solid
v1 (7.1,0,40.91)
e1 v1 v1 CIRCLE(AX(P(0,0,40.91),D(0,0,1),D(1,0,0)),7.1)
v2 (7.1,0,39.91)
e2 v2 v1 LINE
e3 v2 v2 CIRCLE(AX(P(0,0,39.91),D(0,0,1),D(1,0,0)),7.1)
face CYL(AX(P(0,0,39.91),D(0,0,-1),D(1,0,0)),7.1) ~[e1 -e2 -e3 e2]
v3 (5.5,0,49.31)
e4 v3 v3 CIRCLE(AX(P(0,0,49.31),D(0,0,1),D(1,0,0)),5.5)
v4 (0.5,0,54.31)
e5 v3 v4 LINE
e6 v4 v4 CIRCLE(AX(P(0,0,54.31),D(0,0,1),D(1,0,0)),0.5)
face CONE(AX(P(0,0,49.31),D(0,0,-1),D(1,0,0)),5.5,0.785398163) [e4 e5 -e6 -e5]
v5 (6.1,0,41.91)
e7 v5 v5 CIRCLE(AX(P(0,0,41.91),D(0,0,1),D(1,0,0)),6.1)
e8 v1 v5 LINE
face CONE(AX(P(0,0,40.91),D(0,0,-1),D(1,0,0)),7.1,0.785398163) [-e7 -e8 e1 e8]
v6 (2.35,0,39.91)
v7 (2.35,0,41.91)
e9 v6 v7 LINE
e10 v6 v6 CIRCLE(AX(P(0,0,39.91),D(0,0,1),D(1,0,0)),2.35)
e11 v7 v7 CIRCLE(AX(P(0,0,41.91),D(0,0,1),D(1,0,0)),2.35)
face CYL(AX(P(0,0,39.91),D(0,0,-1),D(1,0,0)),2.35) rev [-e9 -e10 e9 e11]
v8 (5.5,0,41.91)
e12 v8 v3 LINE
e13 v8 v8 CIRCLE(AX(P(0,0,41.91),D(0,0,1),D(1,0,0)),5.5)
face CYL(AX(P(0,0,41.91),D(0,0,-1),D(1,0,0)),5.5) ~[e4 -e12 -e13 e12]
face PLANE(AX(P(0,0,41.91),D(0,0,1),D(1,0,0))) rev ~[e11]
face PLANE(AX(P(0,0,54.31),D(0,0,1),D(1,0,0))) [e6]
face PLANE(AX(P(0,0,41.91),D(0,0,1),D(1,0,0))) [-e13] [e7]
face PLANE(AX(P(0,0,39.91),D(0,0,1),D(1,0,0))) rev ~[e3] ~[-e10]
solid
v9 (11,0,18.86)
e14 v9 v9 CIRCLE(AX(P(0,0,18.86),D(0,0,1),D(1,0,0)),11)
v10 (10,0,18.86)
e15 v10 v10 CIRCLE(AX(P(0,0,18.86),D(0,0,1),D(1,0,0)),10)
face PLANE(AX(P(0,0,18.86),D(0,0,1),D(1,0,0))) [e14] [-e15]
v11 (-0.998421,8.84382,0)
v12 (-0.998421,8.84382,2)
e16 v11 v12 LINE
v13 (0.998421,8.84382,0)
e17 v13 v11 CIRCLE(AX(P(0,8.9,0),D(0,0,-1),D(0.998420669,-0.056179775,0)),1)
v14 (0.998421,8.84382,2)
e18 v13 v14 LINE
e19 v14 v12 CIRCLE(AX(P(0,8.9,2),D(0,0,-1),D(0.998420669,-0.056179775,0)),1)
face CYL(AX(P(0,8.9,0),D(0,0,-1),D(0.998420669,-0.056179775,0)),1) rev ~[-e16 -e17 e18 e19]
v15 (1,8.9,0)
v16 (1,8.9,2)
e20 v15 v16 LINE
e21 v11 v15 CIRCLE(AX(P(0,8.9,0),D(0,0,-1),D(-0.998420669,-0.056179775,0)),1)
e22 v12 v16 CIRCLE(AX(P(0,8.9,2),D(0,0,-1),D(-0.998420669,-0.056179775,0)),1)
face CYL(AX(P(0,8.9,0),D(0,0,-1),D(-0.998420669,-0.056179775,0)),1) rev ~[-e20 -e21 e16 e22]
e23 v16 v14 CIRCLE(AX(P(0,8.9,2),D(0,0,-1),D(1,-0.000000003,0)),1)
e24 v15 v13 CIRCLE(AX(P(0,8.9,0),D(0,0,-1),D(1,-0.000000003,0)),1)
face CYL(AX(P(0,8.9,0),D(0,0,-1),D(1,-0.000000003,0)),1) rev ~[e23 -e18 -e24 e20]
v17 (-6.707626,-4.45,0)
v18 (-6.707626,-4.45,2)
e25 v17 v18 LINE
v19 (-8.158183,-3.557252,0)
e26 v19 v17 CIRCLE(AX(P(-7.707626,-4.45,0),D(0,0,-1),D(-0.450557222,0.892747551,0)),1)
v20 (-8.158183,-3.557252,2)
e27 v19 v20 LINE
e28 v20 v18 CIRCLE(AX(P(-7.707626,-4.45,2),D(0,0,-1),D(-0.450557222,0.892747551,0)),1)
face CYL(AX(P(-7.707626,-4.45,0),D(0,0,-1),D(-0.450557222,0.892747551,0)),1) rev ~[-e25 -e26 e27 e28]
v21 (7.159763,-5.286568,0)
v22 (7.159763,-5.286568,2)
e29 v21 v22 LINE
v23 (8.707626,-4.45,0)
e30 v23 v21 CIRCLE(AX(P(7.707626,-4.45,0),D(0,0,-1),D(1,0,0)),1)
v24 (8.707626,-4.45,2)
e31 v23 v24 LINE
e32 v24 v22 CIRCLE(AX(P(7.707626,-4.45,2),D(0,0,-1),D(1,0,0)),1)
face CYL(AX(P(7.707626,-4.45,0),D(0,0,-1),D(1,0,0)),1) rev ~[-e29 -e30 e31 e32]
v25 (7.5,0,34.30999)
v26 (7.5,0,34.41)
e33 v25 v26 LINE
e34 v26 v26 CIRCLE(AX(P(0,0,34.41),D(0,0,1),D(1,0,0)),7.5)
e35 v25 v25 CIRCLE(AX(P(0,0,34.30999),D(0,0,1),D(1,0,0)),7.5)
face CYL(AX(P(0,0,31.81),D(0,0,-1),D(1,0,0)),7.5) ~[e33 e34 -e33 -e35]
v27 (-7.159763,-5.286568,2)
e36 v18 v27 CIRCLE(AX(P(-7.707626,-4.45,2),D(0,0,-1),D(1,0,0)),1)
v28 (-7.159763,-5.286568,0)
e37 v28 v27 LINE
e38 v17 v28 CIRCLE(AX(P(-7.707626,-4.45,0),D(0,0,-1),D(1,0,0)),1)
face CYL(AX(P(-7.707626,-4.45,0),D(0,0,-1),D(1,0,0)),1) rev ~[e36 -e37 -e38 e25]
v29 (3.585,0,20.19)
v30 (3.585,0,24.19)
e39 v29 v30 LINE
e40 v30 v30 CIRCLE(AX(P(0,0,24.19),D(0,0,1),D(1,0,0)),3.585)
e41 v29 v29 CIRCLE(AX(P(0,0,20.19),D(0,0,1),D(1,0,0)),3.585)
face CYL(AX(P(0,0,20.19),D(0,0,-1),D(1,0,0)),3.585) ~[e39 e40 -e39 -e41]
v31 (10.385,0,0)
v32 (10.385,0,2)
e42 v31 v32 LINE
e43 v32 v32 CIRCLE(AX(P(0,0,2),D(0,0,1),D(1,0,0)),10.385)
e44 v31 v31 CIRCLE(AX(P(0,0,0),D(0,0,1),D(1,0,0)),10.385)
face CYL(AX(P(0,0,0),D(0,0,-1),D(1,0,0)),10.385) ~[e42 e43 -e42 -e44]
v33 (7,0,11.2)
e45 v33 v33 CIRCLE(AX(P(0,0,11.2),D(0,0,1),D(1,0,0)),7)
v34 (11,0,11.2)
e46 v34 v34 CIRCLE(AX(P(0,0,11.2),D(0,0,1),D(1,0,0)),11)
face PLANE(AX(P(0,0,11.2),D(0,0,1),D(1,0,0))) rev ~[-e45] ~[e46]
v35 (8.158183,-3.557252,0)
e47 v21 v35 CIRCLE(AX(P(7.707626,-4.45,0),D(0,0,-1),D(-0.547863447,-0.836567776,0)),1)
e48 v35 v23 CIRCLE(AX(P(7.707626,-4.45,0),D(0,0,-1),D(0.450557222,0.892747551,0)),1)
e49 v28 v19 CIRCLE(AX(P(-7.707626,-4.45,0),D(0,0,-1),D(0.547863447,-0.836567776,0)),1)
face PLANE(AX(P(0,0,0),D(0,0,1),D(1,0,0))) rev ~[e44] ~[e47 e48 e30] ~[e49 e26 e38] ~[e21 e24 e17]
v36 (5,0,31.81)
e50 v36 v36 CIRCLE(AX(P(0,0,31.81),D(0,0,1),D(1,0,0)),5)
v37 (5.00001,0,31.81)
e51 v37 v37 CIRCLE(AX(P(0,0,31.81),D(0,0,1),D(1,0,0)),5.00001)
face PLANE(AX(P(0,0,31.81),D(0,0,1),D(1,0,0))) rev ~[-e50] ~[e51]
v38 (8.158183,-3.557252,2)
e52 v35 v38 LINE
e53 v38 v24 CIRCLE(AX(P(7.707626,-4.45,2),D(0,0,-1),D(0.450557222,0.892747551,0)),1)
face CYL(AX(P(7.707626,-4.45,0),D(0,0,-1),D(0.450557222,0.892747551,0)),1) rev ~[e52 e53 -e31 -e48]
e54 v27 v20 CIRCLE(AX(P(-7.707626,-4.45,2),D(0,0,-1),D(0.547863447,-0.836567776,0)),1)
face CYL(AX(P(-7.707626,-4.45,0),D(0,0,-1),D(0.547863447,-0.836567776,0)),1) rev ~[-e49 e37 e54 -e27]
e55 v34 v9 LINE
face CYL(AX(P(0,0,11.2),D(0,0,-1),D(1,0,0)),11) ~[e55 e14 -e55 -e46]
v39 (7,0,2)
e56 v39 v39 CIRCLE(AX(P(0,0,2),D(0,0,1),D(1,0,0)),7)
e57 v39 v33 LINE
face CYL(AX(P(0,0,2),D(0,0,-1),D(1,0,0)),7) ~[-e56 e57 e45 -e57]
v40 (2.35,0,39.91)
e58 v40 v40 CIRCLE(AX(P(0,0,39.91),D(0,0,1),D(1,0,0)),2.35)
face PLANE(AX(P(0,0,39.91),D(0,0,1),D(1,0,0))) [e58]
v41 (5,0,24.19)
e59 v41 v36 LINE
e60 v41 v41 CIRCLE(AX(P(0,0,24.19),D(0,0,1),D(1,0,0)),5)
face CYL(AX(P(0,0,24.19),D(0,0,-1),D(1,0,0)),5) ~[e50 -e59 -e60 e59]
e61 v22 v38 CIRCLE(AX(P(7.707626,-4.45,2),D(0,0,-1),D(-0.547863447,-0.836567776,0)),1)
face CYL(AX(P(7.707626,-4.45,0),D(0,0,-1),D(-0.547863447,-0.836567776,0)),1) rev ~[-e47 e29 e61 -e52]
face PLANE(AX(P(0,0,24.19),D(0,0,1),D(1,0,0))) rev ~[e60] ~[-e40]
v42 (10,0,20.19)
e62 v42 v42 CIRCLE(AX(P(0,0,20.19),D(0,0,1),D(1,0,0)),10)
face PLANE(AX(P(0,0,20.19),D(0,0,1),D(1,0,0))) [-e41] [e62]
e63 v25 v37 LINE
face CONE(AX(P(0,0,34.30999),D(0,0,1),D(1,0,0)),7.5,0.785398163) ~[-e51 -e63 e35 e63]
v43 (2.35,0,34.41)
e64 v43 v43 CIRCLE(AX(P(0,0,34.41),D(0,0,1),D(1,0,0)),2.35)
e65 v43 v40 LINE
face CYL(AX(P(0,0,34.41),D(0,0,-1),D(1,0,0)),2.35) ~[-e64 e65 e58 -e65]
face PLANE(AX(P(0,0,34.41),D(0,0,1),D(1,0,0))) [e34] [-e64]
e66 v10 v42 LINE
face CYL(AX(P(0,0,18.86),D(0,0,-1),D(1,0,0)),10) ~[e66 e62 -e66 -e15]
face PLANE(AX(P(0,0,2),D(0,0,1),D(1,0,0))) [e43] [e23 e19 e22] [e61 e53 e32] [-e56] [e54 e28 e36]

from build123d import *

# Parameters (mm, degrees)
F0_R      = 10.385
F1_DEPTH  = 2
F2_R      = 7
F3_DEPTH  = 9.2
F4_R      = 11
F4_R_2    = 7
F5_DEPTH  = 7.66
F6_R      = 10
F7_DEPTH  = 1.33
F8_R      = 3.585
F9_DEPTH  = 4
F10_R     = 5
F11_DEPTH = 7.62
F12_R     = 7.5
F13_DEPTH = 2.6
F14_SIZE  = 2.49999
F15_R     = 2.35
F16_DEPTH = 5.5
F17_R     = 7.1
F17_R_2   = 2.35
F18_DEPTH = 2
F19_SIZE  = 1
F20_R     = 5.5
F21_DEPTH = 12.4
F22_SIZE  = 5


# Not quite as in the source:
# - a fillet or chamfer is up to 0.001 mm smaller than in the source, because OpenCascade refuses the exact size


with BuildPart() as f1:
    # F0 (on Top) → F1 (new body)
    with BuildSketch(Plane.XY):
        Circle(F0_R)
        with BuildLine():
            ThreePointArc((0.9984206693, 8.8438202247), (6.6368646196, 5.9297578384), (8.9, 0))
            ThreePointArc((8.9, 0), (8.7125722812, -1.8168886165), (8.1581833158, -3.5572524491))
            ThreePointArc((8.1581833158, -3.5572524491), (8.5592590023, -3.9258612884), (8.7076260937, -4.45))
            ThreePointArc((8.7076260937, -4.45), (8.1830924715, -5.3297338936), (7.1597626465, -5.2865677756))
            ThreePointArc((7.1597626465, -5.2865677756), (0, -8.9), (-7.1597626465, -5.2865677756))
            ThreePointArc((-7.1597626465, -5.2865677756), (-8.5736514975, -4.95), (-8.1581833158, -3.5572524491))
            ThreePointArc((-8.1581833158, -3.5572524491), (-7.7076260937, 4.45), (-0.9984206693, 8.8438202247))
            ThreePointArc((-0.9984206693, 8.8438202247), (-0.028100985, 9.8996050893), (1, 8.9))
            ThreePointArc((1, 8.9), (0.9996050893, 8.871899015), (0.9984206693, 8.8438202247))
        make_face(mode=Mode.SUBTRACT)
        with BuildLine():
            ThreePointArc((8.1581833158, -3.5572524491), (8.7125722812, -1.8168886165), (8.9, 0))
            ThreePointArc((8.9, 0), (6.6368646196, 5.9297578384), (0.9984206693, 8.8438202247))
            ThreePointArc((0.9984206693, 8.8438202247), (0, 7.9), (-0.9984206693, 8.8438202247))
            ThreePointArc((-0.9984206693, 8.8438202247), (-7.7076260937, 4.45), (-8.1581833158, -3.5572524491))
            ThreePointArc((-8.1581833158, -3.5572524491), (-7.1834873821, -3.5983670914), (-6.7076260937, -4.45))
            ThreePointArc((-6.7076260937, -4.45), (-6.8278922, -4.9254663778), (-7.1597626465, -5.2865677756))
            ThreePointArc((-7.1597626465, -5.2865677756), (0, -8.9), (7.1597626465, -5.2865677756))
            ThreePointArc((7.1597626465, -5.2865677756), (6.8416006899, -3.95), (8.1581833158, -3.5572524491))
        make_face()
    extrude(amount=F1_DEPTH)

    # F2 (on face) → F3 (join)
    with BuildSketch(Plane.XY.offset(2)):
        Circle(F2_R)
    extrude(amount=F3_DEPTH)

    # F4 (on face) → F5 (join)
    with BuildSketch(Plane.XY.offset(11.2)):
        Circle(F4_R)
        Circle(F4_R_2, mode=Mode.SUBTRACT)
        Circle(F4_R_2)
    extrude(amount=F5_DEPTH)

    # F6 (on face) → F7 (join)
    with BuildSketch(Plane.XY.offset(18.86)):
        Circle(F6_R)
    extrude(amount=F7_DEPTH)

    # F8 (on face) → F9 (join)
    with BuildSketch(Plane.XY.offset(20.19)):
        Circle(F8_R)
    extrude(amount=F9_DEPTH)

    # F10 (on face) → F11 (join)
    with BuildSketch(Plane.XY.offset(24.19)):
        Circle(F10_R)
    extrude(amount=F11_DEPTH)

    # F12 (on face) → F13 (join)
    with BuildSketch(Plane.XY.offset(31.81)):
        Circle(F12_R)
    extrude(amount=F13_DEPTH)

    # F14 (size 2.5 in the source; OpenCascade refuses exactly that, so slightly less here)
    f14_edges = [f1.edges().sort_by_distance(p)[0] for p in [
        (-7.5, 0, 31.81),
    ]]
    chamfer(f14_edges, length=F14_SIZE)

    # F15 (on face) → F16 (join)
    with BuildSketch(Plane.XY.offset(34.41)):
        Circle(F15_R)
    extrude(amount=F16_DEPTH)


with BuildPart() as f18:
    # F17 (on face) → F18 (new body)
    with BuildSketch(Plane.XY.offset(39.91)):
        Circle(F17_R)
        Circle(F17_R_2, mode=Mode.SUBTRACT)
    extrude(amount=F18_DEPTH)

    # F19
    f19_edges = [f18.edges().sort_by_distance(p)[0] for p in [
        (-7.1, 0, 41.91),
    ]]
    chamfer(f19_edges, length=F19_SIZE)

    # F20 (on face) → F21 (join)
    with BuildSketch(Plane.XY.offset(41.91)):
        Circle(F20_R)
    extrude(amount=F21_DEPTH)

    # F22
    f22_edges = [f18.edges().sort_by_distance(p)[0] for p in [
        (-5.5, 0, 54.31),
    ]]
    chamfer(f22_edges, length=F22_SIZE)


solid = Compound([f1.part, f18.part])
